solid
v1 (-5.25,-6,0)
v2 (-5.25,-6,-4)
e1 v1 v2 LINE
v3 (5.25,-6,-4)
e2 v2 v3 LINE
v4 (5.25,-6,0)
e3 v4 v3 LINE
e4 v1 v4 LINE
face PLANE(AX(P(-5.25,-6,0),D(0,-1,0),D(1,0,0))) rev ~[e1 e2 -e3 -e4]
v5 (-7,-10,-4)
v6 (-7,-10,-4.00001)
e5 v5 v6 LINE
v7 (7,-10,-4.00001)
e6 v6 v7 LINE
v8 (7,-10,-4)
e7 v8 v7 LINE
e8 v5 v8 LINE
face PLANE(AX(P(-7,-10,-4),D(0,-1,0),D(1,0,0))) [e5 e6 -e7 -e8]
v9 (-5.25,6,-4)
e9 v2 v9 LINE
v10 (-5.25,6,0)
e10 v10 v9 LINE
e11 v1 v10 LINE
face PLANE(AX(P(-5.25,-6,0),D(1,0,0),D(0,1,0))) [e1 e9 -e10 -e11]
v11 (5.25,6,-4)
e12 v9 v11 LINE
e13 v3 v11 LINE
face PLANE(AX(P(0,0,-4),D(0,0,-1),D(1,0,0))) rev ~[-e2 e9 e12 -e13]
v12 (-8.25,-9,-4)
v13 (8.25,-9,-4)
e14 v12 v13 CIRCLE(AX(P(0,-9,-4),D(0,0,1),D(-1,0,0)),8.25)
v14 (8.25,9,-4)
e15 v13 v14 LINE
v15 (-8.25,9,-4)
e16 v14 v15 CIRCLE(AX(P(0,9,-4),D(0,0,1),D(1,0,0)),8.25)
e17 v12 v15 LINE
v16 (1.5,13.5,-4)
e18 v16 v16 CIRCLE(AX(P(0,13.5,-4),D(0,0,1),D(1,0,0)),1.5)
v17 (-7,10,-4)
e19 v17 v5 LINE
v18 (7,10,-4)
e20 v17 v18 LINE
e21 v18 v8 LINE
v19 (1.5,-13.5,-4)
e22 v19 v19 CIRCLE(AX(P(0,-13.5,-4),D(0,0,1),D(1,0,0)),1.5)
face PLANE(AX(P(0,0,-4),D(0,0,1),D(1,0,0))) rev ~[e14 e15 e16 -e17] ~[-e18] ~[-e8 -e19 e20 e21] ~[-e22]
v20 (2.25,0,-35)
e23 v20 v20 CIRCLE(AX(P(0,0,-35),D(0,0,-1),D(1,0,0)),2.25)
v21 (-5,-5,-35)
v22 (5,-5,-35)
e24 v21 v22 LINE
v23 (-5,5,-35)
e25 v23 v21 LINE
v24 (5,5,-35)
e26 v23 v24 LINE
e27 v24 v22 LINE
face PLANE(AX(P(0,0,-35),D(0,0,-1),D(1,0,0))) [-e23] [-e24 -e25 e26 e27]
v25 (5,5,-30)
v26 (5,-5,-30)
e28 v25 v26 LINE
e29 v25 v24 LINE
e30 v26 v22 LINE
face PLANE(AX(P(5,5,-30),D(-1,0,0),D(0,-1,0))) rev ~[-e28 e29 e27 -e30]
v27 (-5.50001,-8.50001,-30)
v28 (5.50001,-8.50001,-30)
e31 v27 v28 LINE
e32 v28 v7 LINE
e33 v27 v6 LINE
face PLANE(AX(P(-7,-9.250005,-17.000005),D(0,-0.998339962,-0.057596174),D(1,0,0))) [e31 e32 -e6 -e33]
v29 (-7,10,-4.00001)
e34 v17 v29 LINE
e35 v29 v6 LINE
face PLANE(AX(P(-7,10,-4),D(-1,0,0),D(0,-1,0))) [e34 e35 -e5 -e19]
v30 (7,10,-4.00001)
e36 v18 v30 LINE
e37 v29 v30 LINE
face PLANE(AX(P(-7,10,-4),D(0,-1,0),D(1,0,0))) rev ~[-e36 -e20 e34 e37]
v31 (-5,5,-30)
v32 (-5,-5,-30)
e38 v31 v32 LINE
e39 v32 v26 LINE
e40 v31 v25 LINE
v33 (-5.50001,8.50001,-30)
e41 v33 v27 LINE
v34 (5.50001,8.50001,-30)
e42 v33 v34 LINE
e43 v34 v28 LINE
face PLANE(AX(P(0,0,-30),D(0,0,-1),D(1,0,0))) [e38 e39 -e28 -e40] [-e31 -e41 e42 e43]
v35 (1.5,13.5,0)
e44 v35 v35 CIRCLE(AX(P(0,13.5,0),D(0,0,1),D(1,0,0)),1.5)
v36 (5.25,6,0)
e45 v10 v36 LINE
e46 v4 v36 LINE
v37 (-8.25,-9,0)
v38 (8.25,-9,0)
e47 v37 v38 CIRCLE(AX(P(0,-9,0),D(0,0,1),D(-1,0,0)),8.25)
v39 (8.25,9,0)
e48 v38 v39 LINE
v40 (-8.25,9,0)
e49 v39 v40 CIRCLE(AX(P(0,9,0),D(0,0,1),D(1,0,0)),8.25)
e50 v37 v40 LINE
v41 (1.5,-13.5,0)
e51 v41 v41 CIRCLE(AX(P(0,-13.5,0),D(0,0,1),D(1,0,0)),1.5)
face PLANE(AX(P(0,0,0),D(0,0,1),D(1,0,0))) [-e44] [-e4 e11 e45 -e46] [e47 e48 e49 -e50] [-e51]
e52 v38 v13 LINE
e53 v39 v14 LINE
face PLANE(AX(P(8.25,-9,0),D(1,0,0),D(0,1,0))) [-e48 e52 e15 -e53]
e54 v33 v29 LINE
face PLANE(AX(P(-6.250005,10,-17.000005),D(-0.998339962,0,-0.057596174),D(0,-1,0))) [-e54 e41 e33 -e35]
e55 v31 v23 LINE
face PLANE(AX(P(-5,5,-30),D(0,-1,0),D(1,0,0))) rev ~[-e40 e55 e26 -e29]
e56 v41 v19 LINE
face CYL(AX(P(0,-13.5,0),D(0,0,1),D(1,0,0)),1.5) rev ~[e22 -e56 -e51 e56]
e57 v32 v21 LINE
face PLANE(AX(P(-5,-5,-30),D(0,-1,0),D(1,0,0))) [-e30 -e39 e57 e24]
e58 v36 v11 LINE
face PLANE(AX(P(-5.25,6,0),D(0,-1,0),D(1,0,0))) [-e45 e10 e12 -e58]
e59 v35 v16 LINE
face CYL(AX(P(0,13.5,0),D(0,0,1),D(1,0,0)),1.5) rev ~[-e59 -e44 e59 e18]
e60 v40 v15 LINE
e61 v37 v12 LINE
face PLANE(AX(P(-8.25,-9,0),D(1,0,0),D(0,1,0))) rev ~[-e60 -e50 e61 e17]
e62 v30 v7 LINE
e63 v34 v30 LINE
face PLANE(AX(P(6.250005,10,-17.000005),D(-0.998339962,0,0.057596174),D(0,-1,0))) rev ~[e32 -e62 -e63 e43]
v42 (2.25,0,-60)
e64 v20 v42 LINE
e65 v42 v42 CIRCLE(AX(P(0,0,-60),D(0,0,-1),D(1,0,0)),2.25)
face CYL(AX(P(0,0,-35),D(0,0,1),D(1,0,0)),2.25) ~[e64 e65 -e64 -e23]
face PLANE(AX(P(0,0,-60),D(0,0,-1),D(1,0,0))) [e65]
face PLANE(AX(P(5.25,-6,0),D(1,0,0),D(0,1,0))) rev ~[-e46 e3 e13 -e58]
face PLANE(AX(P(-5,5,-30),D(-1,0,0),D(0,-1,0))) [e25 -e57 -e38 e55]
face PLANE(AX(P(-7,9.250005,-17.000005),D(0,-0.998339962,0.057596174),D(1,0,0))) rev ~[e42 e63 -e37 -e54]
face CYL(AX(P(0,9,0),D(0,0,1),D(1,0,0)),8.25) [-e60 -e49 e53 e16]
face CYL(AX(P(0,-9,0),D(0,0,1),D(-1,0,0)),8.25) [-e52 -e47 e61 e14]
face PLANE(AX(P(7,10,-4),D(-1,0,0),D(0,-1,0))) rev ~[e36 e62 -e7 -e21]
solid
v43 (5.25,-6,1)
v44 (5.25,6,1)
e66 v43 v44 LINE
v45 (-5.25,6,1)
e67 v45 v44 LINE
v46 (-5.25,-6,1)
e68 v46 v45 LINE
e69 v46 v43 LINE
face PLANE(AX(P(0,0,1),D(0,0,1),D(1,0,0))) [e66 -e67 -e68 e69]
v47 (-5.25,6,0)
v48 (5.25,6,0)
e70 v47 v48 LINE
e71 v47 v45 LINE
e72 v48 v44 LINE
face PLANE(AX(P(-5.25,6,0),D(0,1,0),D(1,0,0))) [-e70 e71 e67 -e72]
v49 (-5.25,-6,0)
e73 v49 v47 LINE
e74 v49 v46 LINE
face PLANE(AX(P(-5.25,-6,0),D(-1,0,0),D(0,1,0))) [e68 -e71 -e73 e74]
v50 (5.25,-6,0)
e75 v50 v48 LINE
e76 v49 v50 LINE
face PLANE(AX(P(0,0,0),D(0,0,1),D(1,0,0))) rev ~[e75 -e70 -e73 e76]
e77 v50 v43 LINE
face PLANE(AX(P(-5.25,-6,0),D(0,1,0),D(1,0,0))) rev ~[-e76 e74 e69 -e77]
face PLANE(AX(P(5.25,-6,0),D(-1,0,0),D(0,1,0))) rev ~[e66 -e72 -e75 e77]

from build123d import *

# Parameters (mm, degrees)
F0_W      = 16.5
F0_H      = 18
F0_W_2    = 10.5
F0_H_2    = 12
F0_R      = 1.5
F1_DEPTH  = 4
F2_W      = 14
F2_H      = 20
F3_DEPTH  = 26
F4_SIZE2  = 25.99999
F4_SIZE   = 1.49999
F5_W      = 10
F5_H      = 10
F6_DEPTH  = 5
F7_R      = 2.25
F8_DEPTH  = 25
F9_W      = 10.5
F9_H      = 12
F10_DEPTH = 1


# Not quite as in the source:
# - a fillet or chamfer is up to 0.001 mm smaller than in the source, because OpenCascade refuses the exact size


with BuildPart() as f1:
    # F0 (on Top) → F1 (new body)
    with BuildSketch(Plane.XY):
        Rectangle(F0_W, F0_H)
        Rectangle(F0_W_2, F0_H_2, mode=Mode.SUBTRACT)
        with BuildLine():
            Line((-8.25, 9), (8.25, 9))
            ThreePointArc((8.25, 9), (0, 17.25), (-8.25, 9))
        make_face()
        with Locations((0, 13.5)):
            Circle(F0_R, mode=Mode.SUBTRACT)
        with BuildLine():
            ThreePointArc((-8.25, -9), (0, -17.25), (8.25, -9))
            Line((8.25, -9), (-8.25, -9))
        make_face()
        with Locations((0, -13.5)):
            Circle(F0_R, mode=Mode.SUBTRACT)
    extrude(amount=-F1_DEPTH)

    # F2 (on face) → F3 (join)
    with BuildSketch(Plane(origin=(0, 0, -4), x_dir=(1, 0, 0), z_dir=(0, 0, -1))):
        Rectangle(F2_W, F2_H)
    extrude(amount=F3_DEPTH)

    # F4 (size 1.5 and 26 in the source; OpenCascade refuses exactly that, so slightly less here)
    f4_edges = [f1.edges().sort_by_distance(p)[0] for p in [
        (0, -10, -30),
        (0, 10, -30),
        (7, 0, -30),
        (-7, 0, -30),
    ]]
    f4_side = f1.faces().sort_by_distance((0, 0, -30))[0]
    chamfer(f4_edges, length=F4_SIZE, length2=F4_SIZE2, reference=f4_side)

    # F5 (on face) → F6 (join)
    with BuildSketch(Plane(origin=(0, 0, -30), x_dir=(1, 0, 0), z_dir=(0, 0, -1))):
        Rectangle(F5_W, F5_H)
    extrude(amount=F6_DEPTH)

    # F7 (on face) → F8 (join)
    with BuildSketch(Plane(origin=(0, 0, -35), x_dir=(1, 0, 0), z_dir=(0, 0, -1))):
        Circle(F7_R)
    extrude(amount=F8_DEPTH)

    # F9 (on face) → F10 (join)
    with BuildSketch(Plane.XY):
        Rectangle(F9_W, F9_H)
    extrude(amount=F10_DEPTH)


solid = f1.part
